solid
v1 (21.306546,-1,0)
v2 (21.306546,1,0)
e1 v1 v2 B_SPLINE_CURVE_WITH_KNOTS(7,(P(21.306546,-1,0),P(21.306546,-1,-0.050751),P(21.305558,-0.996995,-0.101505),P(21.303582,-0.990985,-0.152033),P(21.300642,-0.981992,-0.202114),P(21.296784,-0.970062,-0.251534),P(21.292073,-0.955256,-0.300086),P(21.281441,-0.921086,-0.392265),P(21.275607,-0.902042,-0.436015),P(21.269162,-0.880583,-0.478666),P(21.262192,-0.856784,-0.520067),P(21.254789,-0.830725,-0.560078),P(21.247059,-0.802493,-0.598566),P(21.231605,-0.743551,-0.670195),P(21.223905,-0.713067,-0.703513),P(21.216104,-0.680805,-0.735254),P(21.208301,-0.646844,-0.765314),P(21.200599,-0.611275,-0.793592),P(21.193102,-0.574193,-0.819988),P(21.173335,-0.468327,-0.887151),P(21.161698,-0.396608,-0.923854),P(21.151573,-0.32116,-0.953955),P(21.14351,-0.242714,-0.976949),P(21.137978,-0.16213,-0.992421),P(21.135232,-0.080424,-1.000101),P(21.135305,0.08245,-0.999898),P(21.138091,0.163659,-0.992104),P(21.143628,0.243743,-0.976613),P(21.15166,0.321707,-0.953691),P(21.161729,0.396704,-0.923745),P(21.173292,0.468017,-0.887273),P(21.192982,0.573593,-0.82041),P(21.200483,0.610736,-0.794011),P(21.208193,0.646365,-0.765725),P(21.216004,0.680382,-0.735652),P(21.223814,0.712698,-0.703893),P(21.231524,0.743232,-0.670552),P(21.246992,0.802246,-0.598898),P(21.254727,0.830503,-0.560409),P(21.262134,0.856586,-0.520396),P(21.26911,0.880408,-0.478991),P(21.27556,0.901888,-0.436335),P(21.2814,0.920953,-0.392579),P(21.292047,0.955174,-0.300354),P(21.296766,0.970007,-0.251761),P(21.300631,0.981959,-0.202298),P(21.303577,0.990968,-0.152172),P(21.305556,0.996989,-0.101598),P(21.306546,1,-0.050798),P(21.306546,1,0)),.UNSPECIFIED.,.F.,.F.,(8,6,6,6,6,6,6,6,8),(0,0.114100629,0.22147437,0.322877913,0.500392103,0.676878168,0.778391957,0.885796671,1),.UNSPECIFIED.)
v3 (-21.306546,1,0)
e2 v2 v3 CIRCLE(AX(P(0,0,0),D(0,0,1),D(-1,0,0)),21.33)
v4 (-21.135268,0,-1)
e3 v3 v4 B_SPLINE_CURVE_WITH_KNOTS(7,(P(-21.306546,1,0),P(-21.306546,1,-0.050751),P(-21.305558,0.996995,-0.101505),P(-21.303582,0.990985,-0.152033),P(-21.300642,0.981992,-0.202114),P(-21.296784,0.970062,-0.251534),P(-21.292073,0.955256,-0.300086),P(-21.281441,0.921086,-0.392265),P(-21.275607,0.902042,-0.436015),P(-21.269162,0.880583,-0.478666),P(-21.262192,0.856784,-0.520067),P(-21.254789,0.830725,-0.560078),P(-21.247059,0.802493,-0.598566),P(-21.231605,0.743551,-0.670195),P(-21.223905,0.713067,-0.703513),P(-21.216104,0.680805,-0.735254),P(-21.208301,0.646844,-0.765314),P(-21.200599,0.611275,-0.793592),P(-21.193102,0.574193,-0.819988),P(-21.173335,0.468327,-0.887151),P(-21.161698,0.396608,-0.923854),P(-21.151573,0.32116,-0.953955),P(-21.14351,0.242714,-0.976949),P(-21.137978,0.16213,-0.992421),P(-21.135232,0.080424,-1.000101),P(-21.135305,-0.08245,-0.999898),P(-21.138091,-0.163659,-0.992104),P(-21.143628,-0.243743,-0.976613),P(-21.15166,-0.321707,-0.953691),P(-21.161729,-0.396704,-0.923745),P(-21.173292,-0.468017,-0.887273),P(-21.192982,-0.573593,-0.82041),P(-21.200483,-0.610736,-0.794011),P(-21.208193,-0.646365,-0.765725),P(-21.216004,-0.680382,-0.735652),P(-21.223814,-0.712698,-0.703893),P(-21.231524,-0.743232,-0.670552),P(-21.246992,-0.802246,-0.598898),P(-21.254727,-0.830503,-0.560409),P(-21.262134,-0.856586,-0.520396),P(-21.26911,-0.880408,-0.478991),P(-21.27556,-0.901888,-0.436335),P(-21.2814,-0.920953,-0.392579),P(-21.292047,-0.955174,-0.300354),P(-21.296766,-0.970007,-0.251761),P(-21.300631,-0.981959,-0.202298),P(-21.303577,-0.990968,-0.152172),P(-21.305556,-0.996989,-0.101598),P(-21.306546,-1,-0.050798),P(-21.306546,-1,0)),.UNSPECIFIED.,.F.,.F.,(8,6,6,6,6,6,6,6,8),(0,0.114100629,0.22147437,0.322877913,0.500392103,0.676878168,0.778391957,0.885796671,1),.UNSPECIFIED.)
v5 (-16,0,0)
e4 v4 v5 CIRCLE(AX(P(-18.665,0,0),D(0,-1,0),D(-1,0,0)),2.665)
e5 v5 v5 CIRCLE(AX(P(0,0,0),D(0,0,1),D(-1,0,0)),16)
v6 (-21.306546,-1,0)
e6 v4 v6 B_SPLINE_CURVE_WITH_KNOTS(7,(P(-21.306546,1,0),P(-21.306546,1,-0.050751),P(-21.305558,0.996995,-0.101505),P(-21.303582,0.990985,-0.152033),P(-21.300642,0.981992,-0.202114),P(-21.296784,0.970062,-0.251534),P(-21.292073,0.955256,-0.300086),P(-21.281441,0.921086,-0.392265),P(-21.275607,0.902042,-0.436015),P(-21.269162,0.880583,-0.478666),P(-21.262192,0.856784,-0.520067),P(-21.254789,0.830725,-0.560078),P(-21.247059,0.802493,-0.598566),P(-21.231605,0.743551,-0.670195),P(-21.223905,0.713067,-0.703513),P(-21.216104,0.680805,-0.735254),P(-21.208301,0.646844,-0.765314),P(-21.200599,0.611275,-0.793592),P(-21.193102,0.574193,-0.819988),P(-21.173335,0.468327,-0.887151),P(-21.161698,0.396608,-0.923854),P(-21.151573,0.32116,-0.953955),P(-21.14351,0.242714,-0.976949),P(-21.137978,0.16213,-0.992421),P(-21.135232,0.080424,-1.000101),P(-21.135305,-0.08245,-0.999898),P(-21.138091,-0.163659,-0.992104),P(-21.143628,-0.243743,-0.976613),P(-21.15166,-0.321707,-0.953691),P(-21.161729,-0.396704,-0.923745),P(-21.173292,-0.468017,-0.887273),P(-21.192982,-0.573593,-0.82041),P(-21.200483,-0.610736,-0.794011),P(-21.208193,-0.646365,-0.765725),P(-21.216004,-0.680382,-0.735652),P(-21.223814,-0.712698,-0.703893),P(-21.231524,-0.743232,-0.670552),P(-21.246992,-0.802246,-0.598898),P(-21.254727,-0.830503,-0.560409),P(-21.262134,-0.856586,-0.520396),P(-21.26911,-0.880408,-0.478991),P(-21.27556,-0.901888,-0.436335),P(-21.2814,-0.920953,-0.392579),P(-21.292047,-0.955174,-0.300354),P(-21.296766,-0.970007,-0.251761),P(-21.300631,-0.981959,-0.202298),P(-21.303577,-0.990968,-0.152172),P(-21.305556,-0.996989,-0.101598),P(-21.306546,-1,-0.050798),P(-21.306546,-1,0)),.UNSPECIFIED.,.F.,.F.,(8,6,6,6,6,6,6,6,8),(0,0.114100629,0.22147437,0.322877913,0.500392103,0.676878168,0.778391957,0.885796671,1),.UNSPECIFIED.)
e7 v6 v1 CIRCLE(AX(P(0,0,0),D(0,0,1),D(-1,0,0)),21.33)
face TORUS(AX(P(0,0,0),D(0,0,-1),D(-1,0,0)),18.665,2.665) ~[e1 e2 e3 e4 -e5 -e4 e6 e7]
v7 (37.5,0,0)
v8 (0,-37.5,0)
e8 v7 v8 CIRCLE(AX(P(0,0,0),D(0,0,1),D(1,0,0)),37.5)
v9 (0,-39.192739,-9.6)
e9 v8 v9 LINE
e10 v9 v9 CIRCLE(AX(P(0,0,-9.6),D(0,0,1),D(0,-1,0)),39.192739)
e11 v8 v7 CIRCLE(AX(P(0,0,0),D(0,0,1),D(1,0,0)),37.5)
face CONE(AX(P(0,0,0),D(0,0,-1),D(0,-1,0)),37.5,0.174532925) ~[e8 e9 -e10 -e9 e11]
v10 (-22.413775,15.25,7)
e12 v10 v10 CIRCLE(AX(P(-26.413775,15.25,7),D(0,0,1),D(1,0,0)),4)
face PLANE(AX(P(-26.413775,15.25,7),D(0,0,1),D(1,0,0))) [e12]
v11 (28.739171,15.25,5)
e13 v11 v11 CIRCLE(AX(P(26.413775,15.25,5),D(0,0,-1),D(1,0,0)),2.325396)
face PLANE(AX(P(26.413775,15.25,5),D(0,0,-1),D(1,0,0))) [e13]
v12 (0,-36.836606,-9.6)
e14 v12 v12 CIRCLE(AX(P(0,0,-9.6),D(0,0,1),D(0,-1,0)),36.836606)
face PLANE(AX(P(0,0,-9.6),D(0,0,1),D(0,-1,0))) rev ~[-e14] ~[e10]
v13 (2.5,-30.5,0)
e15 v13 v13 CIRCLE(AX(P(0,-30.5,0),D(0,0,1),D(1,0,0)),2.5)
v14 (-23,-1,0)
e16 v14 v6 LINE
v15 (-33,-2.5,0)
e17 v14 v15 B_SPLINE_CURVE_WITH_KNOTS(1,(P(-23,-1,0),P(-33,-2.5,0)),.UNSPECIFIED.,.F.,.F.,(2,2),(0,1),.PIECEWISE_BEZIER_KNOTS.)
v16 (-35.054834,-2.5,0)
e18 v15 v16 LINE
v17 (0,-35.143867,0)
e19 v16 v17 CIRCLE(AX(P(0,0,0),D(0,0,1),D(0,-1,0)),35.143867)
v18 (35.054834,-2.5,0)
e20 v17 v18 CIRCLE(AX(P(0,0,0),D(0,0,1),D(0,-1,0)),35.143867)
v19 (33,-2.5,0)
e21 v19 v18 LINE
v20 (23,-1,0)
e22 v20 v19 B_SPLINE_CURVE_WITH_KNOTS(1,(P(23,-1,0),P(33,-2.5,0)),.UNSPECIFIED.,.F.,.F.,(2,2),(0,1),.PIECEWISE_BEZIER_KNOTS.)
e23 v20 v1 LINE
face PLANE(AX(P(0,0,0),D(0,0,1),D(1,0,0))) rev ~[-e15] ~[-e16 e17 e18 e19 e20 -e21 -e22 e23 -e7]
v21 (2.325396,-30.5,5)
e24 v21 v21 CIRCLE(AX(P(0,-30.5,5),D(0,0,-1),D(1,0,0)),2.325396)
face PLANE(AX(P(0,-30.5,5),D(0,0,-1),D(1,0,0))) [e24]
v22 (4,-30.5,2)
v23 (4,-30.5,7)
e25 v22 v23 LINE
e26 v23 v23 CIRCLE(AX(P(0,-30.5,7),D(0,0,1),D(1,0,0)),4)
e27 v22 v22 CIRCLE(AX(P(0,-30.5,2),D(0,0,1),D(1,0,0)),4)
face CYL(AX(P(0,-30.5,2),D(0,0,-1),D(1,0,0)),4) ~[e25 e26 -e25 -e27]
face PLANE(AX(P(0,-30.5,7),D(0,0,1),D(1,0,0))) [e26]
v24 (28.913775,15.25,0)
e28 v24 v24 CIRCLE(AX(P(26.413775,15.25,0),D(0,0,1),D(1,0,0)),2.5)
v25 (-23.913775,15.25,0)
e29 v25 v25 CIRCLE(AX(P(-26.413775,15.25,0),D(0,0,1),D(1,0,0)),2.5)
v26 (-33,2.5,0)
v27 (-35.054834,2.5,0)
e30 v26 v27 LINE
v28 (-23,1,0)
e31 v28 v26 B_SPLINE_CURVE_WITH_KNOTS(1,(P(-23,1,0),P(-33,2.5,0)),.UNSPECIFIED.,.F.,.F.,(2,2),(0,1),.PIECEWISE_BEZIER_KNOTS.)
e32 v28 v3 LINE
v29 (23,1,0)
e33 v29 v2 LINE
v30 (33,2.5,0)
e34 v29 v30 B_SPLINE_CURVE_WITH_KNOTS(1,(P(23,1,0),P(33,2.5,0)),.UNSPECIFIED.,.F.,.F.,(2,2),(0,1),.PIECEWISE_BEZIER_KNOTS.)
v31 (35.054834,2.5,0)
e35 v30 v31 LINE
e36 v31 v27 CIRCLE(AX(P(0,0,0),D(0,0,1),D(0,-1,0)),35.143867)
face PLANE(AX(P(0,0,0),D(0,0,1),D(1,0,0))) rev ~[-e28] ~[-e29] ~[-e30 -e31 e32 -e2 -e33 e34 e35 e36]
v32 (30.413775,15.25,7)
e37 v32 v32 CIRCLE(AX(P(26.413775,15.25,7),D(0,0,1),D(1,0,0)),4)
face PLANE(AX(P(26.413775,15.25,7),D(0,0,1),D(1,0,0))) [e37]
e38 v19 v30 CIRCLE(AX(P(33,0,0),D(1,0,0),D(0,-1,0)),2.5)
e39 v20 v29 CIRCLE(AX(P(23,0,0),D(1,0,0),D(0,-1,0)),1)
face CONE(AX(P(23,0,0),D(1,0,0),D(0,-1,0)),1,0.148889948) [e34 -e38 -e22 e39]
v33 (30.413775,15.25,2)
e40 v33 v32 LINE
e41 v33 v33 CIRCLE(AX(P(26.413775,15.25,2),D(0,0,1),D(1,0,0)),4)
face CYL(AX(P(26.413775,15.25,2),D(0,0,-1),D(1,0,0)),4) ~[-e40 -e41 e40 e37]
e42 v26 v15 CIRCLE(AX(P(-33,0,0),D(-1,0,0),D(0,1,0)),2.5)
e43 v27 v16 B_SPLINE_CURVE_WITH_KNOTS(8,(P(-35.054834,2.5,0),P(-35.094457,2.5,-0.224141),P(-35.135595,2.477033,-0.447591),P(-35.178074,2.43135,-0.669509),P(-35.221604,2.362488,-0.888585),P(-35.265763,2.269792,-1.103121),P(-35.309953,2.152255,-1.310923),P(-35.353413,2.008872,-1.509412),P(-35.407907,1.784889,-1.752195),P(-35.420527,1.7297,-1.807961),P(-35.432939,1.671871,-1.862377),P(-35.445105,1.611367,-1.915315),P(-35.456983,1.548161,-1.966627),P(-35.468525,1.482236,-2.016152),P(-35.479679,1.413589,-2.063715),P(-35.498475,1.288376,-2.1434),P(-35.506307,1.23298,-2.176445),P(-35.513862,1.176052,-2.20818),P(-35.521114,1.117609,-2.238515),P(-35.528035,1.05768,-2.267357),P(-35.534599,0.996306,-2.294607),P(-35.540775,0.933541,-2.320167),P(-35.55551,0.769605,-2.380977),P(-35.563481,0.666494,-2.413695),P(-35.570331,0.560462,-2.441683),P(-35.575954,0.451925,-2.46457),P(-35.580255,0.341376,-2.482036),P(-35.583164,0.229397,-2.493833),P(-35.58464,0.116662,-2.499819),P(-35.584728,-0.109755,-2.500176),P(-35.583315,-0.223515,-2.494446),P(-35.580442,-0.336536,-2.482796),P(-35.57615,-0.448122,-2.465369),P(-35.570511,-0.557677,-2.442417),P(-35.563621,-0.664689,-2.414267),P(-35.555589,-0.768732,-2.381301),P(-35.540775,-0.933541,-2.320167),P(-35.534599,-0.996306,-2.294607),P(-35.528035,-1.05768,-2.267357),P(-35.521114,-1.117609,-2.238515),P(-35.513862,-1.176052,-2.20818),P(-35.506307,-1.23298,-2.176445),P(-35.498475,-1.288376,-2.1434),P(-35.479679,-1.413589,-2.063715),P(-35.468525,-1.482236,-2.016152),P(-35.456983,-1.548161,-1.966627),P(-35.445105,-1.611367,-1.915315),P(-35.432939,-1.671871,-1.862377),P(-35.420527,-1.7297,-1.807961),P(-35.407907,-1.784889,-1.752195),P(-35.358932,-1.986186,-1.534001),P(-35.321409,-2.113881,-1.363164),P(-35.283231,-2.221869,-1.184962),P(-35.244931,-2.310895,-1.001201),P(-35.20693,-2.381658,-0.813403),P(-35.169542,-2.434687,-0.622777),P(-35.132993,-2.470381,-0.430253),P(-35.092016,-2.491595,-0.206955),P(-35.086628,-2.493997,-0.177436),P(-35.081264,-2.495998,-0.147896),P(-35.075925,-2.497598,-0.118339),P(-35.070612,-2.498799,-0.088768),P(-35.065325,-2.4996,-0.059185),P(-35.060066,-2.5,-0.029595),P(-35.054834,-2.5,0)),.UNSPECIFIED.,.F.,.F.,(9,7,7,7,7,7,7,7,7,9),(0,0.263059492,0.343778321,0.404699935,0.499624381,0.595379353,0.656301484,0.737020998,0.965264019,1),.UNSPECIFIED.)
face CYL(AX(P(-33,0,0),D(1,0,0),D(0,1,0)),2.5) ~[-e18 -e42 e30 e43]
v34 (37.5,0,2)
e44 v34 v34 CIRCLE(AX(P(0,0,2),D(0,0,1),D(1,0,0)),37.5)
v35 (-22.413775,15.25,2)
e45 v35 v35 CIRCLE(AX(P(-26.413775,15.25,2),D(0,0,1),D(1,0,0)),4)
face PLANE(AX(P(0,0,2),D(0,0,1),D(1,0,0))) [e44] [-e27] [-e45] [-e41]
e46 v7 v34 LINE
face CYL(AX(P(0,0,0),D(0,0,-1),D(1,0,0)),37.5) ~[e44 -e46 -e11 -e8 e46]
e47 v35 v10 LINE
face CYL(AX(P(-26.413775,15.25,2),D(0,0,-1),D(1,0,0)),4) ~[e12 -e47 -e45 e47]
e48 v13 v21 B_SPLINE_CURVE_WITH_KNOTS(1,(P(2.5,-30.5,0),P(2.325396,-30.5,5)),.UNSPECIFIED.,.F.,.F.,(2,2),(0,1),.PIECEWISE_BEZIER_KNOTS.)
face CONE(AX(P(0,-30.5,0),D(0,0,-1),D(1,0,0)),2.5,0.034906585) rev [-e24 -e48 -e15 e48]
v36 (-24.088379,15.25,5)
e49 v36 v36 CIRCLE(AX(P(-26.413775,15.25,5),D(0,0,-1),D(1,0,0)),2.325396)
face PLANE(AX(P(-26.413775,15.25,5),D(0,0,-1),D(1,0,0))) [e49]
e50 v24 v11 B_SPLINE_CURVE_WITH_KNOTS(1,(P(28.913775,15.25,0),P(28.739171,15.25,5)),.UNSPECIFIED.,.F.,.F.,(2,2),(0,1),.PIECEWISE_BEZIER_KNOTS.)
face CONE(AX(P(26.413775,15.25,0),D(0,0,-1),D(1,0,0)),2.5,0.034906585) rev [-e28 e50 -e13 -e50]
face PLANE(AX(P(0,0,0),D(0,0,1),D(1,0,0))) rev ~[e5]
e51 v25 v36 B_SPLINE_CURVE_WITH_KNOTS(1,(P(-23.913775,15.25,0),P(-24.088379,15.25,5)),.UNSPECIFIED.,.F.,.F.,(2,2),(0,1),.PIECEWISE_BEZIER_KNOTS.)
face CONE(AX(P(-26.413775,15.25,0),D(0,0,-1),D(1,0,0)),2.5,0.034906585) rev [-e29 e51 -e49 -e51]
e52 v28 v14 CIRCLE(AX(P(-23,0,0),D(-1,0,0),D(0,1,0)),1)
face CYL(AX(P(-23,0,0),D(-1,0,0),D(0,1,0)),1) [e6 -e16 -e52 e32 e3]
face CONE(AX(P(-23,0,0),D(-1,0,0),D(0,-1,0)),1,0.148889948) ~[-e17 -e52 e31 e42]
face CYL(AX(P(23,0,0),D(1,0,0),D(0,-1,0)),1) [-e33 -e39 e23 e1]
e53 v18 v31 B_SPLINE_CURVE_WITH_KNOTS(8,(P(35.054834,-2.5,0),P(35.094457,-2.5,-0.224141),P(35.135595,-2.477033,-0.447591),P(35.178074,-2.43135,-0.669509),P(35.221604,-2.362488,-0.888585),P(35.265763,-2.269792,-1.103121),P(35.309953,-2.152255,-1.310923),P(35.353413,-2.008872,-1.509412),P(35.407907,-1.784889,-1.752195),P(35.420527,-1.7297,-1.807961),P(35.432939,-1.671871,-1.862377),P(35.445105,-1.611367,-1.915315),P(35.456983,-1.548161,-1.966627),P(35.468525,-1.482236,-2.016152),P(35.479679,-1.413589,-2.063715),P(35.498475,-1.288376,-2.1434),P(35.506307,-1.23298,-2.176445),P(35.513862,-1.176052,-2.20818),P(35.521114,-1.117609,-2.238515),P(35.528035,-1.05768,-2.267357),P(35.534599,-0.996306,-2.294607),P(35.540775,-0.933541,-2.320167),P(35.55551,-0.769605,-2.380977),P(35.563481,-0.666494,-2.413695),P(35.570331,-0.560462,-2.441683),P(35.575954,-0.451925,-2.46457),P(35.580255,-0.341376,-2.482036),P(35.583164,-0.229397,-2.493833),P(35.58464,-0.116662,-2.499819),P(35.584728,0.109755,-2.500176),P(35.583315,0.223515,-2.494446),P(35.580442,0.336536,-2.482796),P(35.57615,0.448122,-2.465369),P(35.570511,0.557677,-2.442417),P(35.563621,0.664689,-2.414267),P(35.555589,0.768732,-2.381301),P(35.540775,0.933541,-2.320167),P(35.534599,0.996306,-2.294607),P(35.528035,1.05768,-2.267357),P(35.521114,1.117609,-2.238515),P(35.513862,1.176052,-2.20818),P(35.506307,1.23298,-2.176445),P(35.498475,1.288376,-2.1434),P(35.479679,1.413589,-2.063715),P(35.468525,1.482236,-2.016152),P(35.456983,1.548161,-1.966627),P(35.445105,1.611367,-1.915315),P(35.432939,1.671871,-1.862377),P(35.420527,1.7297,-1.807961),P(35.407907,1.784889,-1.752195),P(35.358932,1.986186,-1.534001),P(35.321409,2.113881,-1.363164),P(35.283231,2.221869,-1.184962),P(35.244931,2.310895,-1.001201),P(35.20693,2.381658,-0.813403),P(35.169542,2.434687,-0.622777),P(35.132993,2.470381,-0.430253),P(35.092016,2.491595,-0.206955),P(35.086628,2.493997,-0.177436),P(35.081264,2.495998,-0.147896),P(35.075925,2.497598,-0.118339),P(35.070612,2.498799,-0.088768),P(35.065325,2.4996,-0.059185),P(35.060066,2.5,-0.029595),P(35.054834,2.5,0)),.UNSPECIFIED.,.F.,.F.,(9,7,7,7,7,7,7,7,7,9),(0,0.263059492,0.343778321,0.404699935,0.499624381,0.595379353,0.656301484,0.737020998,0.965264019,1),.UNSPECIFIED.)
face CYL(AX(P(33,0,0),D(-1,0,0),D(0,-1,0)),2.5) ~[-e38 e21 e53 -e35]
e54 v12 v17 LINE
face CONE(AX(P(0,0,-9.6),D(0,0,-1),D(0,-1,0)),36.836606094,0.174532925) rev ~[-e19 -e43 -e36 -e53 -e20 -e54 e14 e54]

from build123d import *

# Parameters (mm, degrees)
F3_R             = 37.5
F4_DEPTH         = 2
F8_R             = 4
F9_DEPTH         = 5
F7_R             = 2.5
F10_DEPTH        = 5
F10_TAPER        = 2
F14_COPIES_COUNT = 2
F16_COPIES_COUNT = 2


# Not quite as in the source:
# - a pattern or mirror of a feature is missing from the dataset's text; its kind, count and spacing are read off the source's solid


with BuildPart() as f2:
    # F1 (on Front) → F2 (revolve)
    with BuildSketch(Plane.XZ):
        with BuildLine():
            Line((-16, 0), (-21.33, 0))
            ThreePointArc((-21.33, 0), (-18.665, -2.665), (-16, 0))
        make_face()
    revolve(axis=Axis((0, 0, 18.396249041), (0, 0, 1)))

    # F3 (on face) → F4 (join)
    with BuildSketch(Plane.XY):
        Circle(F3_R)
    extrude(amount=F4_DEPTH)

    # F5 (on Right) → F6 (revolve)
    with BuildSketch(Plane.YZ):
        Polygon((-36.8366060944, -9.6), (-35.1438670796, 0), (-37.5, 0), (-39.1927390148, -9.6), align=None)
    revolve(axis=Axis((0, 0, 18.396249041), (0, 0, 1)))

    # F8 (on face) → F9 (join)
    with BuildSketch(Plane.XY.offset(2)):
        with Locations((0, -30.5)):
            Circle(F8_R)
        with Locations((26.4137748154, 15.25)):
            Circle(F8_R)
        with Locations((-26.4137748154, 15.25)):
            Circle(F8_R)
    extrude(amount=F9_DEPTH)

    # F7 (on face) → F10 (cut)
    with BuildSketch(Plane(origin=(0, 0, 0), x_dir=(1, 0, 0), z_dir=(0, 0, -1))):
        with Locations((0, 30.5)):
            Circle(F7_R)
        with Locations((-26.4137748154, -15.25)):
            Circle(F7_R)
        with Locations((26.4137748154, -15.25)):
            Circle(F7_R)
    extrude(amount=-F10_DEPTH, taper=F10_TAPER, mode=Mode.SUBTRACT)

    # F13 (on offset) → F14 (join, up to the next surface of F2)
    with BuildSketch(Plane.YZ.offset(33)):
        with BuildLine():
            Line((2.5, 0), (-2.5, 0))
            ThreePointArc((-2.5, 0), (0, -2.5), (2.5, 0))
        make_face()
    f14 = extrude(until=Until.NEXT)

    # F14_copies: F14 ×2 about axis
    f14_copies_axis = Axis((0, 0, 0), (0, 0, 1))
    for i in range(1, F14_COPIES_COUNT):
        add(f14.rotate(f14_copies_axis, i * 360 / F14_COPIES_COUNT))

    # F15 (on offset) → F16 (join, up to the next surface of F2)
    with BuildSketch(Plane.YZ.offset(23)):
        with BuildLine():
            Line((1, 0), (-1, 0))
            ThreePointArc((-1, 0), (0, -1), (1, 0))
        make_face()
    f16 = extrude(until=Until.NEXT, dir=(-1, 0, 0))

    # F16_copies: F16 ×2 about axis
    f16_copies_axis = Axis((0, 0, 0), (0, 0, 1))
    for i in range(1, F16_COPIES_COUNT):
        add(f16.rotate(f16_copies_axis, i * 360 / F16_COPIES_COUNT))

    # F16_face (on face) → F17 section 0
    with BuildSketch(Plane(origin=(23, 0, -0.4244131816), x_dir=(0, 1, 0), z_dir=(1, 0, 0))):
        with BuildLine():
            Line((1, 0.4244131816), (-1, 0.4244131816))
            ThreePointArc((-1, 0.4244131816), (0, -0.5755868184), (1, 0.4244131816))
        make_face()
    # F14_face (on face) → F17 section 1
    with BuildSketch(Plane(origin=(33, 0, -1.0610329539), x_dir=(0, 1, 0), z_dir=(-1, 0, 0))):
        with BuildLine():
            Line((-2.5, -1.0610329539), (2.5, -1.0610329539))
            ThreePointArc((2.5, -1.0610329539), (0, 1.4389670461), (-2.5, -1.0610329539))
        make_face()
    f17 = loft()

    # F17_copies: F17 across plane
    add(f17.mirror(Plane(origin=(0, 0, 0), x_dir=(0, 0, -1), z_dir=(-1, 0, 0))))


solid = f2.part
